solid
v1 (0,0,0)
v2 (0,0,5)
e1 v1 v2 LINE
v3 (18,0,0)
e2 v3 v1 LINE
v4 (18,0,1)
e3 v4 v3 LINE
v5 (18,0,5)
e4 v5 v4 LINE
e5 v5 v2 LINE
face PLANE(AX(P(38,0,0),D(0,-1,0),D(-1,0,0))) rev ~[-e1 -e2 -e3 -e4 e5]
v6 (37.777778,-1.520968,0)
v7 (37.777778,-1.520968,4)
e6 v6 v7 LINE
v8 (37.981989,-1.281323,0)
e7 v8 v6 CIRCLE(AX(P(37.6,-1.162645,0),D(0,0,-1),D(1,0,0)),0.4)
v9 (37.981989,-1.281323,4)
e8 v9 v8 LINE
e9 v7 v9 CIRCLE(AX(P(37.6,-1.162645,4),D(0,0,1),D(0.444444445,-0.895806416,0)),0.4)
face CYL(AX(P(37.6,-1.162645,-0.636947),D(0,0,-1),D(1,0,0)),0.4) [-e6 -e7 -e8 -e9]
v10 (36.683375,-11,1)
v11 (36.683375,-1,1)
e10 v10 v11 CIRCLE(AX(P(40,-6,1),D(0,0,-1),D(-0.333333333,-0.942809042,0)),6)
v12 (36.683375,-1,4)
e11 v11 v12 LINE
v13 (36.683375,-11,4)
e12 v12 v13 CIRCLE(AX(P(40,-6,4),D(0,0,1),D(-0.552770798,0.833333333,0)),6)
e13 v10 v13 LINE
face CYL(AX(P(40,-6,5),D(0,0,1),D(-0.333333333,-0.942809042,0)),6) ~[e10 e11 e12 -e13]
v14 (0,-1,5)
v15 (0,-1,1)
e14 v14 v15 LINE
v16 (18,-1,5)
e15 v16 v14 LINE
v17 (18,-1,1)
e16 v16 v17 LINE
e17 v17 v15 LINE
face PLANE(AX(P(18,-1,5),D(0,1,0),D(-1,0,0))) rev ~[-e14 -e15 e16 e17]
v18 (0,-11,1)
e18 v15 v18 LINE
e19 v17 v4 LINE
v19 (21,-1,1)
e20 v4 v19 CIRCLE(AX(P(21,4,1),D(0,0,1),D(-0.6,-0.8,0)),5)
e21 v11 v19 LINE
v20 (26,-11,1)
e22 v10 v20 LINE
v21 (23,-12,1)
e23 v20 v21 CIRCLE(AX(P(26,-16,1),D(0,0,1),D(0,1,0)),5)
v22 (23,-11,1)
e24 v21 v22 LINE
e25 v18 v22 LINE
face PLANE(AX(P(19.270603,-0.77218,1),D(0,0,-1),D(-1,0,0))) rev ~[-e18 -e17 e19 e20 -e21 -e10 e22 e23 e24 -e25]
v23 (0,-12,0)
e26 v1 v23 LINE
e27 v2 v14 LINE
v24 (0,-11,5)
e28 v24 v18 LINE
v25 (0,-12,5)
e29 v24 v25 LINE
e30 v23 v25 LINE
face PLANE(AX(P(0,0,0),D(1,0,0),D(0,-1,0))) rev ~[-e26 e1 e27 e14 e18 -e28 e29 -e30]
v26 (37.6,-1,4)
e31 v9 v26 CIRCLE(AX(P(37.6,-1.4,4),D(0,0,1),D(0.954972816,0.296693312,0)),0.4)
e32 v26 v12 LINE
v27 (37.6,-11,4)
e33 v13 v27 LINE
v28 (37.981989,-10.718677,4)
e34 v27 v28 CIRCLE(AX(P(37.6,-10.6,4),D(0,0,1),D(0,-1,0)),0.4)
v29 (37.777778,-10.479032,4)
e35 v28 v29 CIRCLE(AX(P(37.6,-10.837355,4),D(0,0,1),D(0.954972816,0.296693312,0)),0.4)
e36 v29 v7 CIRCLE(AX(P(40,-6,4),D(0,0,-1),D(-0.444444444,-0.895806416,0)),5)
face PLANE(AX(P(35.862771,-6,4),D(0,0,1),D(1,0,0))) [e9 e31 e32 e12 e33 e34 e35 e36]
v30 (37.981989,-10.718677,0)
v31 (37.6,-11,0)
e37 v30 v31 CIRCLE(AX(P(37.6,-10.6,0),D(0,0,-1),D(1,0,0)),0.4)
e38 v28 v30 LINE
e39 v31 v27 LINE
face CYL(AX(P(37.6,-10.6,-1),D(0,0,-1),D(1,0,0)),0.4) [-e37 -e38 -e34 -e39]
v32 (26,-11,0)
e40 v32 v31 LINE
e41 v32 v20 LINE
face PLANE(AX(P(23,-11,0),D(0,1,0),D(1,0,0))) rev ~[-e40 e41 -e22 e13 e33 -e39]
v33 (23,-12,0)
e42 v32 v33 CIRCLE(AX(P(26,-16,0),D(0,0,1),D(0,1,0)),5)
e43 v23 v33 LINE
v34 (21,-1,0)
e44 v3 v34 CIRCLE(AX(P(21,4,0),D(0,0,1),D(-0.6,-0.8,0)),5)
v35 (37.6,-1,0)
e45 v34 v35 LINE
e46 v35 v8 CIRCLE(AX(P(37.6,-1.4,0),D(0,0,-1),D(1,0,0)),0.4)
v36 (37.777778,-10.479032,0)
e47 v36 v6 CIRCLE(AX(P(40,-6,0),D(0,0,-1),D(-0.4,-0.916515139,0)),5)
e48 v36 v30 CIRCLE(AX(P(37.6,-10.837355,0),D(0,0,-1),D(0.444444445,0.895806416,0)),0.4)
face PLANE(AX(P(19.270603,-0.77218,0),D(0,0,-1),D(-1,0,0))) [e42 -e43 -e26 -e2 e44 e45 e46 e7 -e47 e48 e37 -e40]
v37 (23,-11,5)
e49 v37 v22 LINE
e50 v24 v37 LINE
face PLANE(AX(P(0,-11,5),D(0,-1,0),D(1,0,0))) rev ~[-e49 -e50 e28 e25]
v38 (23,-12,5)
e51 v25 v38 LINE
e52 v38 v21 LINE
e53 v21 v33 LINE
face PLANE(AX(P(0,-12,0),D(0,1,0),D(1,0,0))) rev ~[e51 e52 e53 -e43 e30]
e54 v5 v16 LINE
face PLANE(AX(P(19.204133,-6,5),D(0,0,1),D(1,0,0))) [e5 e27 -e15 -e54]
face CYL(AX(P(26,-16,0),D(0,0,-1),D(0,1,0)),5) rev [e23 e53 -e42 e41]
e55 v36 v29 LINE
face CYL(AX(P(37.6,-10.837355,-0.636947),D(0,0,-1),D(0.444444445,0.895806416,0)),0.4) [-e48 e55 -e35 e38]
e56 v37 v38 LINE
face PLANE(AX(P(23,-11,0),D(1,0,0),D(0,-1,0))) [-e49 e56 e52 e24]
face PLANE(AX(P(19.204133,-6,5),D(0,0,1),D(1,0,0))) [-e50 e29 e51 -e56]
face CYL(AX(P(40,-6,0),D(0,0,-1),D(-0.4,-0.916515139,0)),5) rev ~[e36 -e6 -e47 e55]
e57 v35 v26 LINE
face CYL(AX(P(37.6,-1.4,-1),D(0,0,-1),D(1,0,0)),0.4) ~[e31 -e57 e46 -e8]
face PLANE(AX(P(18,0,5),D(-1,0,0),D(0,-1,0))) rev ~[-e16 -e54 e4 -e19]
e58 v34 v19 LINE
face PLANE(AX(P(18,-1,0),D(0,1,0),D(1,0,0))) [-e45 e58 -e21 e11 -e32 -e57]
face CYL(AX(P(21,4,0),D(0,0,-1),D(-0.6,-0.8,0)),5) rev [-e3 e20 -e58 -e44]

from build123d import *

# Parameters (mm, degrees)
F1_DEPTH    = 5
F3_DEPTH    = 4
F4_W        = 15
F4_H        = 1
F4_W_2      = 20
F5_DEPTH    = 25
F6_T1_DEPTH = 6.2738947701
F6_T3_DEPTH = 7
F8_DEPTH    = 1
F9_T1_DEPTH = 1


# Not quite as in the source:
# - a fillet or chamfer that OpenCascade refuses, or shapes differently, is made with other operations: its cross-section is extruded or revolved along the edge and cut away or added


with BuildPart() as f1:
    # F0 (on Top) → F1 (new body)
    with BuildSketch(Plane.XY):
        with BuildLine():
            Line((38, 0), (0, 0))
            Line((0, 0), (0, -12))
            Line((0, -12), (38, -12))
            Line((38, -12), (38, -10.582575695))
            ThreePointArc((38, -10.582575695), (35, -6), (38, -1.417424305))
            Line((38, -1.417424305), (38, 0))
        make_face()
    extrude(amount=F1_DEPTH)

    # F2 (on face) → F3 (cut)
    with BuildSketch(Plane.XY.offset(5)):
        with BuildLine():
            ThreePointArc((38, -11.6568542495), (34, -6), (38, -0.3431457505))
            Line((38, -0.3431457505), (38, 0))
            Line((38, 0), (18, 0))
            Line((18, 0), (18, -1))
            Line((18, -1), (0, -1))
            Line((0, -1), (0, -11))
            Line((0, -11), (23, -11))
            Line((23, -11), (23, -12))
            Line((23, -12), (38, -12))
            Line((38, -12), (38, -11.6568542495))
        make_face()
    extrude(amount=-F3_DEPTH, mode=Mode.SUBTRACT)

    # F4 (on face) → F5 (cut)
    with BuildSketch(Plane(origin=(0, 0, 0), x_dir=(1, 0, 0), z_dir=(0, 0, -1))):
        with Locations((30.5, 11.5)):
            Rectangle(F4_W, F4_H)
        with Locations((28, 0.5)):
            Rectangle(F4_W_2, F4_H)
    extrude(amount=-F5_DEPTH, mode=Mode.SUBTRACT)

    # F6: fillet of radius 0.4 on 4 edges, made by hand

    # F6_s2 → F6_t1 (cut)
    with BuildSketch(Plane.XY.offset(-0.6369473851)):
        with BuildLine():
            ThreePointArc((37.7777777778, -10.4790320824), (37.9399346342, -10.6265361383), (38, -10.837354649))
            Line((38, -10.837354649), (38, -10.582575695))
            ThreePointArc((38, -10.582575695), (37.8882541717, -10.5321660998), (37.7777777778, -10.4790320824))
        make_face()
        with BuildLine():
            ThreePointArc((38, -1.162645351), (37.9399346342, -1.3734638617), (37.7777777778, -1.5209679176))
            ThreePointArc((37.7777777778, -1.5209679176), (37.8882541717, -1.4678339002), (38, -1.417424305))
            Line((38, -1.417424305), (38, -1.162645351))
        make_face()
    extrude(amount=F6_T1_DEPTH, mode=Mode.SUBTRACT)

    # F6_s4 → F6_t3 (cut)
    with BuildSketch(Plane.XY.offset(-1)):
        with BuildLine():
            ThreePointArc((38, -10.6), (37.8828427125, -10.8828427125), (37.6, -11))
            Line((37.6, -11), (38, -11))
            Line((38, -11), (38, -10.6))
        make_face()
        with BuildLine():
            ThreePointArc((38, -1.4), (37.8828427125, -1.1171572875), (37.6, -1))
            Line((37.6, -1), (38, -1))
            Line((38, -1), (38, -1.4))
        make_face()
    extrude(amount=F6_T3_DEPTH, mode=Mode.SUBTRACT)

    # F7 (on face) → F8 (cut)
    with BuildSketch(Plane.XY.offset(5)):
        with BuildLine():
            ThreePointArc((36.6833752096, -1), (34, -6), (36.6833752096, -11))
            Line((36.6833752096, -11), (37.6, -11))
            ThreePointArc((37.6, -11), (37.8372014652, -10.9220799045), (37.9819891264, -10.7186773245))
            ThreePointArc((37.9819891264, -10.7186773245), (37.9044539493, -10.5779171946), (37.7777777778, -10.4790320824))
            ThreePointArc((37.7777777778, -10.4790320824), (35, -6), (37.7777777778, -1.5209679176))
            ThreePointArc((37.7777777778, -1.5209679176), (37.9044539493, -1.4220828054), (37.9819891264, -1.2813226755))
            ThreePointArc((37.9819891264, -1.2813226755), (37.8372014652, -1.0779200955), (37.6, -1))
            Line((37.6, -1), (36.6833752096, -1))
        make_face()
    extrude(amount=-F8_DEPTH, mode=Mode.SUBTRACT)

    # F9: fillet of radius 5 on 2 edges, made by hand

    # F9_s2 → F9_t1 (join)
    with BuildSketch(Plane.XY):
        with BuildLine():
            ThreePointArc((18, 0), (19.4188611699, -0.7434164903), (21, -1))
            Line((21, -1), (18, -1))
            Line((18, -1), (18, 0))
        make_face()
        with BuildLine():
            ThreePointArc((26, -11), (24.4188611699, -11.2565835097), (23, -12))
            Line((23, -12), (23, -11))
            Line((23, -11), (26, -11))
        make_face()
    extrude(amount=F9_T1_DEPTH)


solid = f1.part
